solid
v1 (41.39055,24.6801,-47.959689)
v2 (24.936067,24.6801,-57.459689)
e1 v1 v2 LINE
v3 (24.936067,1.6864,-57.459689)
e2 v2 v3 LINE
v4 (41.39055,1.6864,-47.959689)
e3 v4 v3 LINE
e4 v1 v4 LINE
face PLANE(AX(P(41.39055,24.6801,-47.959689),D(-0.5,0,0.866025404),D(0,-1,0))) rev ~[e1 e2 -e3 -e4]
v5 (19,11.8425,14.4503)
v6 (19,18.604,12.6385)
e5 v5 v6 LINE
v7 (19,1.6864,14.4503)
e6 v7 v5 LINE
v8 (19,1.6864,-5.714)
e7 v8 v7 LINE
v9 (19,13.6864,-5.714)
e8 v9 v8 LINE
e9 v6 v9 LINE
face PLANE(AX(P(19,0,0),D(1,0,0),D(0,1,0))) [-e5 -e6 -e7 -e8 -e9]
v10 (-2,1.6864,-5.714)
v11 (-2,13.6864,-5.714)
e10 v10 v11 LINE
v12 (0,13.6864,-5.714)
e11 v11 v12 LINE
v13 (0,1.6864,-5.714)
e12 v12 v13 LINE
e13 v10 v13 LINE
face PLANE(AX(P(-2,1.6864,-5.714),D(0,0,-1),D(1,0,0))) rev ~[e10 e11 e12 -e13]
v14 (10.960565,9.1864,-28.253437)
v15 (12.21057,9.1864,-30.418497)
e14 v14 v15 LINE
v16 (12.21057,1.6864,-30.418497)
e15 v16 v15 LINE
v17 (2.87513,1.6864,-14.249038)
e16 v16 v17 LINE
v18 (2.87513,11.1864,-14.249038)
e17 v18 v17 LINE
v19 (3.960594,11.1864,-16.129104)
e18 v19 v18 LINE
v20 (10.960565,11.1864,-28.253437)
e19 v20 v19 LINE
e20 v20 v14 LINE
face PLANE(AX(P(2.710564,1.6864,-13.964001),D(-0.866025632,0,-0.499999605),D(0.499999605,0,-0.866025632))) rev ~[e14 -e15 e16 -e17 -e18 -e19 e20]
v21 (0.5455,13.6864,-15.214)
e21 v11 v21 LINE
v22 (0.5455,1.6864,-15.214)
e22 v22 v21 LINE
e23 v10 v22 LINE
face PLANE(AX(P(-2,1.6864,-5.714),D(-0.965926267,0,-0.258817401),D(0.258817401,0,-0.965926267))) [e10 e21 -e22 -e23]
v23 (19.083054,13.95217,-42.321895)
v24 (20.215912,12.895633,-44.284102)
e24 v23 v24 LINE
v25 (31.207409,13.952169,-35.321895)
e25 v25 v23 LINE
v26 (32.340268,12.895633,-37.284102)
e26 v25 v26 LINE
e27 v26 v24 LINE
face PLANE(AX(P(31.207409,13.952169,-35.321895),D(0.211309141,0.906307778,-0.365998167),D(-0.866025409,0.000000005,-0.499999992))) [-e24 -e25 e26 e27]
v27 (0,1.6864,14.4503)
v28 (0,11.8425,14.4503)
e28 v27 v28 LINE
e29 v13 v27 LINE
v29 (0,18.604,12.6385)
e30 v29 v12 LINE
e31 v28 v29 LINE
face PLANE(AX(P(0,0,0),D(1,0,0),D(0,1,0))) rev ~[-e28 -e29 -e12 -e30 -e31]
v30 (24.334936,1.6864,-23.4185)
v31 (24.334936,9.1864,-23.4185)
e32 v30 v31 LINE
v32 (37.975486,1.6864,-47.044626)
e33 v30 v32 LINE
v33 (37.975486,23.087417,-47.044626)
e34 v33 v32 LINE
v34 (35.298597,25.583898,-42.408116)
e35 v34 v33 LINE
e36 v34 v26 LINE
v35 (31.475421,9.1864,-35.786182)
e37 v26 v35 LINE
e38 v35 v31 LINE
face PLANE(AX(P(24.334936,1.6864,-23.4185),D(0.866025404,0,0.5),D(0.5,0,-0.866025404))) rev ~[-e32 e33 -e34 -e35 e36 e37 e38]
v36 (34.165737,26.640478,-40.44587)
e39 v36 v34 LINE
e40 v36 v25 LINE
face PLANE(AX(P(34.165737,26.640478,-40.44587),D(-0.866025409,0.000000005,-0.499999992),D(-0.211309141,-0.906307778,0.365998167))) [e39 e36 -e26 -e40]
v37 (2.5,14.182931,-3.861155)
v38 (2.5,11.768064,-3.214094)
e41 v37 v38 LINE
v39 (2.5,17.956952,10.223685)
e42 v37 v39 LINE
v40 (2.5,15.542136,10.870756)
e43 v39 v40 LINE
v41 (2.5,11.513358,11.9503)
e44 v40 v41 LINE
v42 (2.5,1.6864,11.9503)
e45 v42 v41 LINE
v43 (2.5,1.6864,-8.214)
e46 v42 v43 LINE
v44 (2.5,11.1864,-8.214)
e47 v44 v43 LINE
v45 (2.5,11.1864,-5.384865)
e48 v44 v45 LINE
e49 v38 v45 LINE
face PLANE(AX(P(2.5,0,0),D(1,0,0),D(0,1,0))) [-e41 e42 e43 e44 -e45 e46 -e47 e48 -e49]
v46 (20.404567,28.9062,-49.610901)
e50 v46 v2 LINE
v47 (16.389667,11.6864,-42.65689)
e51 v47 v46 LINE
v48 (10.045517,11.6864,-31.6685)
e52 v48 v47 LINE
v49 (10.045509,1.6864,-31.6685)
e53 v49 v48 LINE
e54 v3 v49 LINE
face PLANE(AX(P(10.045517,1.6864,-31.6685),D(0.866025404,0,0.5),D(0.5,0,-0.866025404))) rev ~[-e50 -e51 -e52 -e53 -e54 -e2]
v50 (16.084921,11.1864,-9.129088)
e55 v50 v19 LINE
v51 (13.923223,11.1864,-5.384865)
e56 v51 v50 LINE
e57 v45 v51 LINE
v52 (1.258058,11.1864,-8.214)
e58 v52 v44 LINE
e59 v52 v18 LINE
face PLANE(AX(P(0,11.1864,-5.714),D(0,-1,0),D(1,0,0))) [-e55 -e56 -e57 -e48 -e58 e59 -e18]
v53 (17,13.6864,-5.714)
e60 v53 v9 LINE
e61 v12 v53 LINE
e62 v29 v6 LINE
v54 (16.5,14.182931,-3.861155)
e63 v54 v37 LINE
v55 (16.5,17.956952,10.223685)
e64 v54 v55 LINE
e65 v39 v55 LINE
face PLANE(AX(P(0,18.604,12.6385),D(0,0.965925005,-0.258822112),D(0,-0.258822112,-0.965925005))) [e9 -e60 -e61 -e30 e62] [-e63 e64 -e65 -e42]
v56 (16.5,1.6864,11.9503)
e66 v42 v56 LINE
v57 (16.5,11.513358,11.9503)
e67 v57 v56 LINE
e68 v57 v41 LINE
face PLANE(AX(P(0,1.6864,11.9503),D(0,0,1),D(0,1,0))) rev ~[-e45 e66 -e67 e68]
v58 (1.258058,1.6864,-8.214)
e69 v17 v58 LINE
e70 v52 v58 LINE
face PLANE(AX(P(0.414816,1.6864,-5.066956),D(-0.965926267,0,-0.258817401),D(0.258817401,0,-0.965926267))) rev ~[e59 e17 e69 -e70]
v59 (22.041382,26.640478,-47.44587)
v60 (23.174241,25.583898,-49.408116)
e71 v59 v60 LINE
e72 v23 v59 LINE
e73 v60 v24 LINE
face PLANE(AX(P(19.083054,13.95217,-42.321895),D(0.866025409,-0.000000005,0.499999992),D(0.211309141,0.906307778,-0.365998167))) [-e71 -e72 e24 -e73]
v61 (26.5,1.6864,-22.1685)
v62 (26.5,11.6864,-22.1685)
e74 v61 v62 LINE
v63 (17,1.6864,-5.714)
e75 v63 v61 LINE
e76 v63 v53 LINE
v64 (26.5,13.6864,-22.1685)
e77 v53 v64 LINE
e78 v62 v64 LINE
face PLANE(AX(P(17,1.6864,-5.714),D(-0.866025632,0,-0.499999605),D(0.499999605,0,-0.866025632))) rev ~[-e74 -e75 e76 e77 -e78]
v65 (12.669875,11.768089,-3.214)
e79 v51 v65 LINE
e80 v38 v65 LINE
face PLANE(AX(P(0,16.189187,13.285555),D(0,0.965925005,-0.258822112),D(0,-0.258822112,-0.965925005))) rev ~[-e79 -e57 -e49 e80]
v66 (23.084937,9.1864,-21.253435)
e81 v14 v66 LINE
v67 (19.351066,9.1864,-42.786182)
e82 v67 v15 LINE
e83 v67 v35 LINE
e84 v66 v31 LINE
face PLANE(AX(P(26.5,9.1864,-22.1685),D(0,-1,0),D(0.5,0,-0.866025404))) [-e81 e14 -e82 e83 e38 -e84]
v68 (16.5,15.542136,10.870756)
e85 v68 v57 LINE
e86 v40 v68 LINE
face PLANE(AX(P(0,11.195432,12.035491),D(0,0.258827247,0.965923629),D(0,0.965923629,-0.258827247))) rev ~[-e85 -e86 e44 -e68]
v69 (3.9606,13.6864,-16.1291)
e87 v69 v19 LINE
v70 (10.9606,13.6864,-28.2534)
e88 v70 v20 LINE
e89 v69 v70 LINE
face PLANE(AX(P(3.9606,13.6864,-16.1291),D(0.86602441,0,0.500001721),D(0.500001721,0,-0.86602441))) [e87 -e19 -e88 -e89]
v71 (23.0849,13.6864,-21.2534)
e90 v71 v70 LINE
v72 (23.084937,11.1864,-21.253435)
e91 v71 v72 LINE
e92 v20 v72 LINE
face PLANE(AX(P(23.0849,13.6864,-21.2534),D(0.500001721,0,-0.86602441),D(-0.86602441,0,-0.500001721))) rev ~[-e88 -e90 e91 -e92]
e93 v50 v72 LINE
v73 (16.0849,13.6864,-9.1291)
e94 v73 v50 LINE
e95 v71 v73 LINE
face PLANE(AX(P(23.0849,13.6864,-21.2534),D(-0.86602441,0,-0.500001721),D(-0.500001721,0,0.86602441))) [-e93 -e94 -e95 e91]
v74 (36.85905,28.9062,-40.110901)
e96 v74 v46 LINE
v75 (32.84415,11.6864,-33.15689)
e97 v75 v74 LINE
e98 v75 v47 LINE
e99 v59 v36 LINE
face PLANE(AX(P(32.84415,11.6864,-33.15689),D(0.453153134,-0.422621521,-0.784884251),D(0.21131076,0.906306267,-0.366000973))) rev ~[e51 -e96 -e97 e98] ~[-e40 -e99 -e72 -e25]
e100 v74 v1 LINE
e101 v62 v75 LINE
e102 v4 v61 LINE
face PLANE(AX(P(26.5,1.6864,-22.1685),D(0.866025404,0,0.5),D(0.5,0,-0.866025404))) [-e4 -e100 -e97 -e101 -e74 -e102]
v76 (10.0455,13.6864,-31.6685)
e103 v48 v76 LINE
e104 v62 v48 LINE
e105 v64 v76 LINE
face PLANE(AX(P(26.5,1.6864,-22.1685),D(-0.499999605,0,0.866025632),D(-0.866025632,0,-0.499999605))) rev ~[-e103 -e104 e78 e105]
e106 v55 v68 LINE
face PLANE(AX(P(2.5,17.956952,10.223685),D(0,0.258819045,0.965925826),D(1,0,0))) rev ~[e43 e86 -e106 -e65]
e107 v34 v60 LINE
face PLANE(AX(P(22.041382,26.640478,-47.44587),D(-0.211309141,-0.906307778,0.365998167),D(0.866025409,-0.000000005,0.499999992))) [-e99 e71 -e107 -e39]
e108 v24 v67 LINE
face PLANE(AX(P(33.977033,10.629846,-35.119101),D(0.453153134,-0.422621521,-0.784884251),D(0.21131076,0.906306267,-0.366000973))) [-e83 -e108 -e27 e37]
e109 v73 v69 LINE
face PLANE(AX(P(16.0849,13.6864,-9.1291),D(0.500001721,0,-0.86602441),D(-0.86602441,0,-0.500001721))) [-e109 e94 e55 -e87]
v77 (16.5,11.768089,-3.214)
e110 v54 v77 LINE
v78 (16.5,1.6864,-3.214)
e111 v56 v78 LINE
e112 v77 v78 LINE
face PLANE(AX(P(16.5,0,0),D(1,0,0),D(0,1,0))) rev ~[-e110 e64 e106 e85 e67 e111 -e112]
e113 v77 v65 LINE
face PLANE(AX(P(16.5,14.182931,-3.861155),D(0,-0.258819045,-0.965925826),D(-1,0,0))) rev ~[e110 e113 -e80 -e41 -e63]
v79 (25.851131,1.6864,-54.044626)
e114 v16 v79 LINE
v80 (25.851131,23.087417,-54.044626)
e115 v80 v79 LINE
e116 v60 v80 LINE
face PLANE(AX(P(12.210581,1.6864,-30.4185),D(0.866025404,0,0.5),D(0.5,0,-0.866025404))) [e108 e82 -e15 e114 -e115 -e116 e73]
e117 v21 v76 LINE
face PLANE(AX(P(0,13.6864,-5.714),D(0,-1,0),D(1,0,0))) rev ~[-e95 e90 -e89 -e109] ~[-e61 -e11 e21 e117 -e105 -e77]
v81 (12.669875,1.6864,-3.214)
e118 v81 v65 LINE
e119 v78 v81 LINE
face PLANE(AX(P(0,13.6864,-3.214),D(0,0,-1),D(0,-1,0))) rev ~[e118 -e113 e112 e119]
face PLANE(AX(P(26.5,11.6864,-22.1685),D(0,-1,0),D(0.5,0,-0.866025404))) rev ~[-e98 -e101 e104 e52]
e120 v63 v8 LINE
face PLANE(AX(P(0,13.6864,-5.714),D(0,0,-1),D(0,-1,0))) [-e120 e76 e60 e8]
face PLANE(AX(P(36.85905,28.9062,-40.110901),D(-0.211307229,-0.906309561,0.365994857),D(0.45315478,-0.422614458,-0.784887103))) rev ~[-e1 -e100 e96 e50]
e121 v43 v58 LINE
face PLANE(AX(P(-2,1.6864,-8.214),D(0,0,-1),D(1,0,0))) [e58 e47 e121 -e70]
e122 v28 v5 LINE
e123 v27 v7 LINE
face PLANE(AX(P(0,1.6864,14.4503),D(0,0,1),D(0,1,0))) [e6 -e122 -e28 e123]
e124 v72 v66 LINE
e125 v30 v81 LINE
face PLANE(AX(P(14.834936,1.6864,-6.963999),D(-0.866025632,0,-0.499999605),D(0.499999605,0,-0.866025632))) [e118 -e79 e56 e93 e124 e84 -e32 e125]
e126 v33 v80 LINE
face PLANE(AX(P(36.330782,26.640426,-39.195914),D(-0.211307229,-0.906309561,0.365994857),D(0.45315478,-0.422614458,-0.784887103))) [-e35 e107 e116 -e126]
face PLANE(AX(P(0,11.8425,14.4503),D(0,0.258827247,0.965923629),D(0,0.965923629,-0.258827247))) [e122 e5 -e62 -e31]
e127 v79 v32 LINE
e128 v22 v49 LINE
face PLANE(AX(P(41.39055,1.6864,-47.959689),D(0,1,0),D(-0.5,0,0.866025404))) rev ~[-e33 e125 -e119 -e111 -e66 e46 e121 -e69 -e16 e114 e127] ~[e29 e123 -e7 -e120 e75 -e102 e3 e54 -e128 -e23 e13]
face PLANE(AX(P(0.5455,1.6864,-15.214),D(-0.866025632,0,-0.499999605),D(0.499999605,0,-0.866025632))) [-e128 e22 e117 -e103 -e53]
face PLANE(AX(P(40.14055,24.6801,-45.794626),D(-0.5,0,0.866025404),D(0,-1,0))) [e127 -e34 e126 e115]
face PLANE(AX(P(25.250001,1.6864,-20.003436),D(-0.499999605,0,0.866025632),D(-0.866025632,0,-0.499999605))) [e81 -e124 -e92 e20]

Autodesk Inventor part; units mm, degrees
ref_plane "YZ Plane" through (0, 0, 0) normal (1, 0, 0) x (0, 1, 0)
ref_plane "XZ Plane" through (0, 0, 0) normal (0, 1, 0) x (-1, 0, 0)
ref_plane "XY Plane" through (0, 0, 0) normal (0, 0, 1) x (1, 0, 0)
sketch "Sketch1" plane through (0, 0, 0) normal (1, 0, 0) x (0, 1, 0)
  line L0 (1.6864, 14.4503) -> (11.8425, 14.4503)
  line L1 (11.8425, 14.4503) -> (18.604, 12.6385)
  line L2 (18.604, 12.6385) -> (13.6864, -5.714)
  line L3 (13.6864, -5.714) -> (1.6864, -5.714)
  line L4 (1.6864, -5.714) -> (1.6864, 14.4503)
  point P0 (0, 0)
  dimension "d0" = 19
  dimension "d1" = 7
  dimension "d2" = 105
  dimension "d3" = 12
extrude "Extrusion1" add sketch "Sketch1" along normal blind 19
sketch "Sketch2" plane through (0, 1.6864, -5.714) normal (0, -1, 0) x (1, 0, 0)
  line L0 (0, 0) -> (19, 0) projected
  line L1 (26.5, -16.4545) -> (10.0455, -25.9545)
  line L2 (0, 0) -> (0, 20.1643) construction
  line L3 (0.5455, -9.5) -> (10.0455, -25.9545)
  line L4 (-2, 0) -> (17, 0)
  line L5 (-2, 0) -> (0.5455, -9.5)
  line L6 (17, 0) -> (26.5, -16.4545)
  line L7 (17, 0) -> (0.5455, -9.5) construction
  point P0 (0, 5.714)
  dimension "d6" = 19
  dimension "d10" = 19
  dimension "d23" = 19
  dimension "d25" = 30
  dimension "d26" = 19
  dimension "d27" = 2
extrude "Extrusion2" add sketch "Sketch2" against normal blind 12
sketch "Sketch3" plane through (26.5, 1.6864, -22.1685) normal (0.8660254, 0, 0.5) x (0.5, 0, -0.8660254)
  line L0 (0, 0) -> (0, 10)
  line L1 (0, 10) -> (0, 15.9167) construction
  line L2 (0, 15.9167) -> (12.6883, 10) construction
  line L3 (12.6883, 10) -> (20.7181, 27.2198)
  line L4 (20.7181, 27.2198) -> (29.7811, 22.9937)
  line L5 (29.7811, 22.9937) -> (29.7811, 0)
  line L6 (29.7811, 0) -> (0, 0)
  line L7 (0, 10) -> (12.6883, 10)
  line L8 (0, 0) -> (0, 12) projected
  dimension "d16" = 19
  dimension "d17" = 10
  dimension "d18" = 14
  dimension "d20" = 25
  dimension "d30" = 10
extrude "Extrusion4" add sketch "Sketch3" against normal blind 19
shell "Shell1" thickness 2.5 removed faces 1 at (27.7756, 1.6864, -37.0445)
sketch "Sketch4" plane through (0, 18.604, 12.6385) normal (0, 0.9659258, -0.258819) x (1, 0, 0)
  line L0 (2.5, 2.5) -> (16.5, 2.5) projected
  line L1 (16.5, 17.0817) -> (16.5, 2.5) projected
  line L2 (2.5, 2.5) -> (16.5, 2.5)
  line L3 (16.5, 2.5) -> (16.5, 17.0817)
  line L4 (16.5, 17.0817) -> (2.5, 17.0817)
  line L5 (2.5, 17.0817) -> (2.5, 2.5)
  point P0 (0, 17.023)
sketch "Sketch5" plane through (0, 13.6864, -5.714) normal (0, 1, 0) x (1, 0, 0)
  line L0 (23.0849, 15.5394) -> (10.9606, 22.5394) projected
  line L1 (10.9606, 22.5394) -> (23.0849, 15.5394)
  line L2 (23.0849, 15.5394) -> (16.0849, 3.4151)
  line L3 (16.0849, 3.4151) -> (3.9606, 10.4151)
  line L4 (3.9606, 10.4151) -> (10.9606, 22.5394)
  point P0 (0, -5.714)
  dimension "d32" = 14
sketch "Sketch6" plane through (32.8442, 11.6864, -33.1569) normal (-0.4531539, 0.4226183, 0.7848856) x (0.8660254, 0, 0.5)
  line L0 (-16.5, 16.5) -> (-2.5, 16.5)
  line L1 (-2.5, 16.5) -> (-2.5, 2.5)
  line L2 (-2.5, 2.5) -> (-16.5, 2.5)
  line L3 (-16.5, 2.5) -> (-16.5, 16.5)
  line L4 (0, 19) -> (-19, 19) projected
  line L5 (-19, 0) -> (-19, 19) projected
  point P0 (-11.8654, -29.6671)
  dimension "d33" = 14
  dimension "d34" = 14
  dimension "d35" = 2.5
  dimension "d36" = 2.5
extrude "Extrusion5" cut sketch "Sketch4" against normal up to next
extrude "Extrusion6" cut sketch "Sketch5" against normal up to next
extrude "Extrusion7" cut sketch "Sketch6" against normal up to next
properties part number "k2_thumb"
